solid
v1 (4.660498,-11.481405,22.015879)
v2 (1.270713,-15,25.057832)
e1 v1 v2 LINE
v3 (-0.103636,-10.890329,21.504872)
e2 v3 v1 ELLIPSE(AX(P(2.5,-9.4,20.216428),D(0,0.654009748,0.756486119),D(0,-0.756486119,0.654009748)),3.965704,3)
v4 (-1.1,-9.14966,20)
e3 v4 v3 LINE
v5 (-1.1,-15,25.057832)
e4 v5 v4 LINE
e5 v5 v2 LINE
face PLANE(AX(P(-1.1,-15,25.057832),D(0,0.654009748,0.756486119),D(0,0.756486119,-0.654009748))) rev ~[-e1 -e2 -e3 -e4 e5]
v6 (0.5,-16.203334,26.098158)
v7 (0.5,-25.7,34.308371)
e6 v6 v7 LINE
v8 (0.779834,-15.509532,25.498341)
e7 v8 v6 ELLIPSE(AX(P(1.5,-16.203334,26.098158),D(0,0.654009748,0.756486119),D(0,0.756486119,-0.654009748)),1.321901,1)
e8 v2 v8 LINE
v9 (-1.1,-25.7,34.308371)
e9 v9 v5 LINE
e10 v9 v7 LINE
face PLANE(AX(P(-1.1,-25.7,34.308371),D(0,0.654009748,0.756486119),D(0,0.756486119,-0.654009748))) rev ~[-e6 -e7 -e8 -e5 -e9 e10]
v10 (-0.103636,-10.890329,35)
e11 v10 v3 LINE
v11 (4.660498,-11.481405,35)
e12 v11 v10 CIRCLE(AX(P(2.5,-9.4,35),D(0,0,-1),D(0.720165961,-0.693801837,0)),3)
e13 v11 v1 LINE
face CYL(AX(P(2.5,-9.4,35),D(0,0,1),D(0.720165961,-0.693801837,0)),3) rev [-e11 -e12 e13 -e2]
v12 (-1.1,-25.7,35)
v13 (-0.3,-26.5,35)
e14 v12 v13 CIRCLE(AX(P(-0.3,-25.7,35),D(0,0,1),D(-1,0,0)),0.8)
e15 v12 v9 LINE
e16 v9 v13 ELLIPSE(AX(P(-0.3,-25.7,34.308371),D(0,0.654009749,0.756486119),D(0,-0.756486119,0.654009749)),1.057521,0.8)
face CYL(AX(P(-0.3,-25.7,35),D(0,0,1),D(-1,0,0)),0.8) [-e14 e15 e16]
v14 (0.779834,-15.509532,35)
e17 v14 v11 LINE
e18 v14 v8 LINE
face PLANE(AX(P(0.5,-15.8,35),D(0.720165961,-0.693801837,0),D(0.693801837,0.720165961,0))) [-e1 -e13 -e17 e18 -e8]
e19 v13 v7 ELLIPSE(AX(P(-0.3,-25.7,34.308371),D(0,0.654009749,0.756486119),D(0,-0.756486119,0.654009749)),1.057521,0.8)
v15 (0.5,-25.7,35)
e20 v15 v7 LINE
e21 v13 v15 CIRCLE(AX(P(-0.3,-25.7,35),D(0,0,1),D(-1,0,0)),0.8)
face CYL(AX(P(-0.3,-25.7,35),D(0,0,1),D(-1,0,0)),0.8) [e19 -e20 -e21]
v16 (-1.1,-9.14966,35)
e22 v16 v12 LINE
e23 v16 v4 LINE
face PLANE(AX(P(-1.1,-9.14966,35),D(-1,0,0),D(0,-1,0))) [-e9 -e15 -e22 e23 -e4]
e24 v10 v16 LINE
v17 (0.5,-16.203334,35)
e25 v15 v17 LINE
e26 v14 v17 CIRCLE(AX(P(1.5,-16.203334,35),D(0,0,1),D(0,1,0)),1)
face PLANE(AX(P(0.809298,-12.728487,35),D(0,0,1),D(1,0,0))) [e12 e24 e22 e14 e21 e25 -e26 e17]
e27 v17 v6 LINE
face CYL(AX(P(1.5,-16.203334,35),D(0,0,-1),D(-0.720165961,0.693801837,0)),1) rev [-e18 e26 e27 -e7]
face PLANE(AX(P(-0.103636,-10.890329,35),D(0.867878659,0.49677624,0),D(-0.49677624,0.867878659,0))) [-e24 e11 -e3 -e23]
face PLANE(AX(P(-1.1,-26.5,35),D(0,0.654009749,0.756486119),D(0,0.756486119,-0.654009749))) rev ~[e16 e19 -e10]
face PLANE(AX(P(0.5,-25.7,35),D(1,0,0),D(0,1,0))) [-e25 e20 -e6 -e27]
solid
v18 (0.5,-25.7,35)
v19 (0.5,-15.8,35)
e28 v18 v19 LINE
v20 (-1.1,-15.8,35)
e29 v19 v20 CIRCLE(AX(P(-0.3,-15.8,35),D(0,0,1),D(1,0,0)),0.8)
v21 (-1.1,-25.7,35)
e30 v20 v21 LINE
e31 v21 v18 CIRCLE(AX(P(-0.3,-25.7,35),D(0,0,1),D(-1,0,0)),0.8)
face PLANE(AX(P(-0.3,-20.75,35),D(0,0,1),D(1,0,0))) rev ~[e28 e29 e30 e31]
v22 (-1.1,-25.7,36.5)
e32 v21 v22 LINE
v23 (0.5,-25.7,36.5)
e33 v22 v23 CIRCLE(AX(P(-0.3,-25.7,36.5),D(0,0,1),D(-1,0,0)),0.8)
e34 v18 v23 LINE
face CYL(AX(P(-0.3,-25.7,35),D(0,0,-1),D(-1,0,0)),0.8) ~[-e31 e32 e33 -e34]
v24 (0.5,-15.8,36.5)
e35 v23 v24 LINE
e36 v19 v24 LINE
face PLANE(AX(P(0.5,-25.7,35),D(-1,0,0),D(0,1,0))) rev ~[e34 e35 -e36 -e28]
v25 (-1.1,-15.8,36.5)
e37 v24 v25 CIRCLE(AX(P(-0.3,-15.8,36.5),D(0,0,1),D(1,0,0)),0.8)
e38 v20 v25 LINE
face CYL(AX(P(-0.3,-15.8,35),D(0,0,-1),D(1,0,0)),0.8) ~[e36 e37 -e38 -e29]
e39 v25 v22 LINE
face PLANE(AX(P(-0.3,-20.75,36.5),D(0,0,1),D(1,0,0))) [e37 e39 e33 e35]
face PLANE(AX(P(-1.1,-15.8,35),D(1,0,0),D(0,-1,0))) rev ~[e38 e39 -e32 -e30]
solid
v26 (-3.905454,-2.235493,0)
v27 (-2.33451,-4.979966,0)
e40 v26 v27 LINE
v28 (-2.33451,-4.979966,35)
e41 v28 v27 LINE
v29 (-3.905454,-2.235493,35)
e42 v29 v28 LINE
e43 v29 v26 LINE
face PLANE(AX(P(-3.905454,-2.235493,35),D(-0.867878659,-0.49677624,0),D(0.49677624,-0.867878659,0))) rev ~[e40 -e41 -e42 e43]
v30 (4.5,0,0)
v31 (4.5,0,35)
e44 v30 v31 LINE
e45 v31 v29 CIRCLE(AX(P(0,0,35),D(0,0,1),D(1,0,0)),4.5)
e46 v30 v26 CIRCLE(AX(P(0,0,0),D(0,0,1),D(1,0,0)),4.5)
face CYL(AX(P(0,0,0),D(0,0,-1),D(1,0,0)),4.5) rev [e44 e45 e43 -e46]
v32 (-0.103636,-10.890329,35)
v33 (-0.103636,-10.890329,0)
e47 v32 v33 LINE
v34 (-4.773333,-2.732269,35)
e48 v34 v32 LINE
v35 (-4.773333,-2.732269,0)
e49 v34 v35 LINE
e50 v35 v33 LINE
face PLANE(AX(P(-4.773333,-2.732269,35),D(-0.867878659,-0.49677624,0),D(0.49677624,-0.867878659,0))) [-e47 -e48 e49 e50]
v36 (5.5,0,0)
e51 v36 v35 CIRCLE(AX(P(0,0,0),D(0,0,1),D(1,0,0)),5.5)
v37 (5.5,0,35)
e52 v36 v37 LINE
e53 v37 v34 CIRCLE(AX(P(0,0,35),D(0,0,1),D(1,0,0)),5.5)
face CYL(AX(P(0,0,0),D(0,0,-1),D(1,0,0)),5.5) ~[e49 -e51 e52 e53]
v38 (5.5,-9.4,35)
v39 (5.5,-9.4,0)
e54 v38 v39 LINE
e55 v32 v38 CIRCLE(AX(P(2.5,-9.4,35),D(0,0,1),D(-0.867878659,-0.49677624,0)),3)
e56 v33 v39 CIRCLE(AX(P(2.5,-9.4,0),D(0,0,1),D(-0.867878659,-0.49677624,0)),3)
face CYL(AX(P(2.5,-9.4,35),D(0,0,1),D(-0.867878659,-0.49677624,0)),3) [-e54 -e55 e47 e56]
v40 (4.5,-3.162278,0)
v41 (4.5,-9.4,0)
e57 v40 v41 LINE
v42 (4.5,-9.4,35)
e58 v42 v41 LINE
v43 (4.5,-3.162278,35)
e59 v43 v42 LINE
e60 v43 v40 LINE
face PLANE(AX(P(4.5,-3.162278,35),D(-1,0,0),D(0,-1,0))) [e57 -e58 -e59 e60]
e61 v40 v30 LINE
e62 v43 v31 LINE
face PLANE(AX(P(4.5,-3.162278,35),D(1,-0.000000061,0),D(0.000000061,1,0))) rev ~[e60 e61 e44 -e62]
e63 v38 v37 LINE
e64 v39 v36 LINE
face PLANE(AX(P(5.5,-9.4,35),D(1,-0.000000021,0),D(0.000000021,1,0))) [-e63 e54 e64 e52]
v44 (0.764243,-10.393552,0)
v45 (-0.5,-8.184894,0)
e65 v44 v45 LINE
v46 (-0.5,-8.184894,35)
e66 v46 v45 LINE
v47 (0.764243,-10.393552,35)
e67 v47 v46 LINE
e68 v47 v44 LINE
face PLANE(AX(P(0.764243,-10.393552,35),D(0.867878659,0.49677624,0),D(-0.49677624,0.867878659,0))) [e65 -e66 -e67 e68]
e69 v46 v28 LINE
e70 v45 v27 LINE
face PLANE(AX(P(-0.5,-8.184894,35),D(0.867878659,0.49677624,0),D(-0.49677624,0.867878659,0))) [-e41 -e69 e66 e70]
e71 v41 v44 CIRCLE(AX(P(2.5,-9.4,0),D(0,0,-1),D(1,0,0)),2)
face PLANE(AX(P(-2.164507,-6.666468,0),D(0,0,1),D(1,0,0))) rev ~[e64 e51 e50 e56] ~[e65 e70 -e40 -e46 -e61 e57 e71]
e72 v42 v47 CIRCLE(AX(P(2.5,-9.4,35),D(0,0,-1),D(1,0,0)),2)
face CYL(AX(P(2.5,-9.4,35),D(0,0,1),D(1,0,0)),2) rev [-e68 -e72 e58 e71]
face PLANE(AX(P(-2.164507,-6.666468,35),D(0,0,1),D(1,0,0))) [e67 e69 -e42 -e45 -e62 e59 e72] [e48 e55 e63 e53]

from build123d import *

# Parameters (mm, degrees)
F0_R      = 5.5
F0_R_2    = 4.5
F1_DEPTH  = 35
F3_DEPTH  = 1.5
F5_DEPTH  = 35
F7_DEPTH  = 35
F9_DEPTH  = 35.001
F11_DEPTH = 15
F13_DEPTH = 25
F14_R     = 1


# Not quite as in the source:
# - ends of sketch curves that miss each other by under 0.0002 mm in the source are joined


with BuildPart() as f1:
    # F0 (on Top) → F1 (new body)
    with BuildSketch(Plane.XY):
        Circle(F0_R)
        Circle(F0_R_2, mode=Mode.SUBTRACT)
    extrude(amount=F1_DEPTH)

    # F6 (on face) → F7 (join)
    with BuildSketch(Plane.XY.offset(35)):
        with BuildLine():
            Line((-0.5, -9.4), (-0.5, -8.1848935982))
            Line((-0.5, -8.1848935982), (-2.3345095585, -4.9799663775))
            ThreePointArc((-2.3345095585, -4.9799663775), (-3.7273838867, -4.0443305207), (-4.773332625, -2.7322693226))
            Line((-4.773332625, -2.7322693226), (-0.1036359901, -10.8903286733))
            ThreePointArc((-0.1036359901, -10.8903286733), (-0.3992160983, -10.1710680876), (-0.5, -9.4))
        make_face()
        with BuildLine():
            ThreePointArc((5.5, 0), (5.2440441901, -1.6583125558), (4.4999998063, -3.1622779358))
            Line((4.4999998063, -3.1622779358), (4.4999998063, -9.4))
            ThreePointArc((4.4999998063, -9.4), (3.0140452866, -11.3328106364), (0.764242669, -10.3935524328))
            Line((0.764242669, -10.3935524328), (-0.5, -8.1848935982))
            Line((-0.5, -8.1848935982), (-0.5, -9.4))
            ThreePointArc((-0.5, -9.4), (-0.3992160983, -10.1710680876), (-0.1036359901, -10.8903286733))
            ThreePointArc((-0.1036359901, -10.8903286733), (3.2710679908, -12.2992160015), (5.4999998063, -9.4))
            Line((5.4999998063, -9.4), (5.5, 0))
        make_face()
    extrude(amount=-F7_DEPTH)

    # F8 (on face) → F9 (cut, through all)
    with BuildSketch(Plane.XY.offset(35)):
        with BuildLine():
            Line((-3.9054539659, -2.2354930822), (-2.3345095585, -4.9799663775))
            ThreePointArc((-2.3345095585, -4.9799663775), (1.4136247101, -5.3152295509), (4.4999998063, -3.1622779358))
            Line((4.4999998063, -3.1622779358), (4.5, 0))
            ThreePointArc((4.5, 0), (1.1566021688, -4.3488241426), (-3.9054539659, -2.2354930822))
        make_face()
    extrude(amount=-F9_DEPTH, mode=Mode.SUBTRACT)


with BuildPart() as f1b:
    # F0 (on Top) → F1, piece 2 (new body)
    with BuildSketch(Plane.XY):
        with BuildLine():
            Line((0.5, -25.7), (0.5, -15.8))
            ThreePointArc((0.5, -15.8), (-0.3, -15), (-1.1, -15.8))
            Line((-1.1, -15.8), (-1.1, -25.7))
            ThreePointArc((-1.1, -25.7), (-0.3, -26.5), (0.5, -25.7))
        make_face()
    extrude(amount=F1_DEPTH)

    # F4 (on face) → F5 (cut)
    with BuildSketch(Plane(origin=(0, 0, 0), x_dir=(1, 0, 0), z_dir=(0, 0, -1))):
        with BuildLine():
            Line((-1.1, 25.7), (-1.1, 15.8))
            ThreePointArc((-1.1, 15.8), (-0.3, 15), (0.5, 15.8))
            Line((0.5, 15.8), (0.5, 25.7))
            ThreePointArc((0.5, 25.7), (-0.3, 26.5), (-1.1, 25.7))
        make_face()
    extrude(amount=-F5_DEPTH, mode=Mode.SUBTRACT)


with BuildPart() as f3:
    # F2 (on face) → F3 (new body)
    with BuildSketch(Plane.XY.offset(35)):
        with BuildLine():
            Line((0.5, -25.7), (0.5, -15.8))
            ThreePointArc((0.5, -15.8), (-0.3, -15), (-1.1, -15.8))
            Line((-1.1, -15.8), (-1.1, -25.7))
            ThreePointArc((-1.1, -25.7), (-0.3, -26.5), (0.5, -25.7))
        make_face()
    extrude(amount=F3_DEPTH)


with BuildPart() as f11:
    # F10 (on face) → F11 (new body)
    with BuildSketch(Plane.XY.offset(35)):
        with BuildLine():
            ThreePointArc((-1.1, -15.8), (-0.3, -15), (0.5, -15.8))
            Line((0.5, -15.8), (4.6604977162, -11.4814054431))
            ThreePointArc((4.6604977162, -11.4814054431), (2.130627765, -12.3771737676), (-0.1036359901, -10.8903286733))
            Line((-0.1036359901, -10.8903286733), (-1.1, -9.1496595542))
            Line((-1.1, -9.1496595542), (-1.1, -15.8))
        make_face()
        with BuildLine():
            ThreePointArc((-1.1, -25.7), (-0.3, -26.5), (0.5, -25.7))
            Line((0.5, -25.7), (0.5, -15.8))
            ThreePointArc((0.5, -15.8), (-0.3, -15), (-1.1, -15.8))
            Line((-1.1, -15.8), (-1.1, -25.7))
        make_face()
    extrude(amount=-F11_DEPTH)

    # F12 (on face) → F13 (cut)
    with BuildSketch(Plane(origin=(-1.1, 0, 0), x_dir=(0, -1, 0), z_dir=(-1, 0, 0))):
        Polygon((15, 20), (15, 25.0578319752), (9.1496595542, 20), align=None)
        Polygon((25.7, 34.30837092), (15, 25.0578319752), (15, 20), (25.7, 20), align=None)
        Polygon((26.5, 20), (26.5, 35), (25.7, 34.30837092), (25.7, 20), align=None)
    extrude(amount=-F13_DEPTH, mode=Mode.SUBTRACT)

    # F14
    f14_edges = [f11.edges().sort_by_distance(p)[0] for p in [
        (0.5, -15.8, 30.374731),
    ]]
    fillet(f14_edges, radius=F14_R)


solid = Compound([f1.part, f3.part, f11.part])
